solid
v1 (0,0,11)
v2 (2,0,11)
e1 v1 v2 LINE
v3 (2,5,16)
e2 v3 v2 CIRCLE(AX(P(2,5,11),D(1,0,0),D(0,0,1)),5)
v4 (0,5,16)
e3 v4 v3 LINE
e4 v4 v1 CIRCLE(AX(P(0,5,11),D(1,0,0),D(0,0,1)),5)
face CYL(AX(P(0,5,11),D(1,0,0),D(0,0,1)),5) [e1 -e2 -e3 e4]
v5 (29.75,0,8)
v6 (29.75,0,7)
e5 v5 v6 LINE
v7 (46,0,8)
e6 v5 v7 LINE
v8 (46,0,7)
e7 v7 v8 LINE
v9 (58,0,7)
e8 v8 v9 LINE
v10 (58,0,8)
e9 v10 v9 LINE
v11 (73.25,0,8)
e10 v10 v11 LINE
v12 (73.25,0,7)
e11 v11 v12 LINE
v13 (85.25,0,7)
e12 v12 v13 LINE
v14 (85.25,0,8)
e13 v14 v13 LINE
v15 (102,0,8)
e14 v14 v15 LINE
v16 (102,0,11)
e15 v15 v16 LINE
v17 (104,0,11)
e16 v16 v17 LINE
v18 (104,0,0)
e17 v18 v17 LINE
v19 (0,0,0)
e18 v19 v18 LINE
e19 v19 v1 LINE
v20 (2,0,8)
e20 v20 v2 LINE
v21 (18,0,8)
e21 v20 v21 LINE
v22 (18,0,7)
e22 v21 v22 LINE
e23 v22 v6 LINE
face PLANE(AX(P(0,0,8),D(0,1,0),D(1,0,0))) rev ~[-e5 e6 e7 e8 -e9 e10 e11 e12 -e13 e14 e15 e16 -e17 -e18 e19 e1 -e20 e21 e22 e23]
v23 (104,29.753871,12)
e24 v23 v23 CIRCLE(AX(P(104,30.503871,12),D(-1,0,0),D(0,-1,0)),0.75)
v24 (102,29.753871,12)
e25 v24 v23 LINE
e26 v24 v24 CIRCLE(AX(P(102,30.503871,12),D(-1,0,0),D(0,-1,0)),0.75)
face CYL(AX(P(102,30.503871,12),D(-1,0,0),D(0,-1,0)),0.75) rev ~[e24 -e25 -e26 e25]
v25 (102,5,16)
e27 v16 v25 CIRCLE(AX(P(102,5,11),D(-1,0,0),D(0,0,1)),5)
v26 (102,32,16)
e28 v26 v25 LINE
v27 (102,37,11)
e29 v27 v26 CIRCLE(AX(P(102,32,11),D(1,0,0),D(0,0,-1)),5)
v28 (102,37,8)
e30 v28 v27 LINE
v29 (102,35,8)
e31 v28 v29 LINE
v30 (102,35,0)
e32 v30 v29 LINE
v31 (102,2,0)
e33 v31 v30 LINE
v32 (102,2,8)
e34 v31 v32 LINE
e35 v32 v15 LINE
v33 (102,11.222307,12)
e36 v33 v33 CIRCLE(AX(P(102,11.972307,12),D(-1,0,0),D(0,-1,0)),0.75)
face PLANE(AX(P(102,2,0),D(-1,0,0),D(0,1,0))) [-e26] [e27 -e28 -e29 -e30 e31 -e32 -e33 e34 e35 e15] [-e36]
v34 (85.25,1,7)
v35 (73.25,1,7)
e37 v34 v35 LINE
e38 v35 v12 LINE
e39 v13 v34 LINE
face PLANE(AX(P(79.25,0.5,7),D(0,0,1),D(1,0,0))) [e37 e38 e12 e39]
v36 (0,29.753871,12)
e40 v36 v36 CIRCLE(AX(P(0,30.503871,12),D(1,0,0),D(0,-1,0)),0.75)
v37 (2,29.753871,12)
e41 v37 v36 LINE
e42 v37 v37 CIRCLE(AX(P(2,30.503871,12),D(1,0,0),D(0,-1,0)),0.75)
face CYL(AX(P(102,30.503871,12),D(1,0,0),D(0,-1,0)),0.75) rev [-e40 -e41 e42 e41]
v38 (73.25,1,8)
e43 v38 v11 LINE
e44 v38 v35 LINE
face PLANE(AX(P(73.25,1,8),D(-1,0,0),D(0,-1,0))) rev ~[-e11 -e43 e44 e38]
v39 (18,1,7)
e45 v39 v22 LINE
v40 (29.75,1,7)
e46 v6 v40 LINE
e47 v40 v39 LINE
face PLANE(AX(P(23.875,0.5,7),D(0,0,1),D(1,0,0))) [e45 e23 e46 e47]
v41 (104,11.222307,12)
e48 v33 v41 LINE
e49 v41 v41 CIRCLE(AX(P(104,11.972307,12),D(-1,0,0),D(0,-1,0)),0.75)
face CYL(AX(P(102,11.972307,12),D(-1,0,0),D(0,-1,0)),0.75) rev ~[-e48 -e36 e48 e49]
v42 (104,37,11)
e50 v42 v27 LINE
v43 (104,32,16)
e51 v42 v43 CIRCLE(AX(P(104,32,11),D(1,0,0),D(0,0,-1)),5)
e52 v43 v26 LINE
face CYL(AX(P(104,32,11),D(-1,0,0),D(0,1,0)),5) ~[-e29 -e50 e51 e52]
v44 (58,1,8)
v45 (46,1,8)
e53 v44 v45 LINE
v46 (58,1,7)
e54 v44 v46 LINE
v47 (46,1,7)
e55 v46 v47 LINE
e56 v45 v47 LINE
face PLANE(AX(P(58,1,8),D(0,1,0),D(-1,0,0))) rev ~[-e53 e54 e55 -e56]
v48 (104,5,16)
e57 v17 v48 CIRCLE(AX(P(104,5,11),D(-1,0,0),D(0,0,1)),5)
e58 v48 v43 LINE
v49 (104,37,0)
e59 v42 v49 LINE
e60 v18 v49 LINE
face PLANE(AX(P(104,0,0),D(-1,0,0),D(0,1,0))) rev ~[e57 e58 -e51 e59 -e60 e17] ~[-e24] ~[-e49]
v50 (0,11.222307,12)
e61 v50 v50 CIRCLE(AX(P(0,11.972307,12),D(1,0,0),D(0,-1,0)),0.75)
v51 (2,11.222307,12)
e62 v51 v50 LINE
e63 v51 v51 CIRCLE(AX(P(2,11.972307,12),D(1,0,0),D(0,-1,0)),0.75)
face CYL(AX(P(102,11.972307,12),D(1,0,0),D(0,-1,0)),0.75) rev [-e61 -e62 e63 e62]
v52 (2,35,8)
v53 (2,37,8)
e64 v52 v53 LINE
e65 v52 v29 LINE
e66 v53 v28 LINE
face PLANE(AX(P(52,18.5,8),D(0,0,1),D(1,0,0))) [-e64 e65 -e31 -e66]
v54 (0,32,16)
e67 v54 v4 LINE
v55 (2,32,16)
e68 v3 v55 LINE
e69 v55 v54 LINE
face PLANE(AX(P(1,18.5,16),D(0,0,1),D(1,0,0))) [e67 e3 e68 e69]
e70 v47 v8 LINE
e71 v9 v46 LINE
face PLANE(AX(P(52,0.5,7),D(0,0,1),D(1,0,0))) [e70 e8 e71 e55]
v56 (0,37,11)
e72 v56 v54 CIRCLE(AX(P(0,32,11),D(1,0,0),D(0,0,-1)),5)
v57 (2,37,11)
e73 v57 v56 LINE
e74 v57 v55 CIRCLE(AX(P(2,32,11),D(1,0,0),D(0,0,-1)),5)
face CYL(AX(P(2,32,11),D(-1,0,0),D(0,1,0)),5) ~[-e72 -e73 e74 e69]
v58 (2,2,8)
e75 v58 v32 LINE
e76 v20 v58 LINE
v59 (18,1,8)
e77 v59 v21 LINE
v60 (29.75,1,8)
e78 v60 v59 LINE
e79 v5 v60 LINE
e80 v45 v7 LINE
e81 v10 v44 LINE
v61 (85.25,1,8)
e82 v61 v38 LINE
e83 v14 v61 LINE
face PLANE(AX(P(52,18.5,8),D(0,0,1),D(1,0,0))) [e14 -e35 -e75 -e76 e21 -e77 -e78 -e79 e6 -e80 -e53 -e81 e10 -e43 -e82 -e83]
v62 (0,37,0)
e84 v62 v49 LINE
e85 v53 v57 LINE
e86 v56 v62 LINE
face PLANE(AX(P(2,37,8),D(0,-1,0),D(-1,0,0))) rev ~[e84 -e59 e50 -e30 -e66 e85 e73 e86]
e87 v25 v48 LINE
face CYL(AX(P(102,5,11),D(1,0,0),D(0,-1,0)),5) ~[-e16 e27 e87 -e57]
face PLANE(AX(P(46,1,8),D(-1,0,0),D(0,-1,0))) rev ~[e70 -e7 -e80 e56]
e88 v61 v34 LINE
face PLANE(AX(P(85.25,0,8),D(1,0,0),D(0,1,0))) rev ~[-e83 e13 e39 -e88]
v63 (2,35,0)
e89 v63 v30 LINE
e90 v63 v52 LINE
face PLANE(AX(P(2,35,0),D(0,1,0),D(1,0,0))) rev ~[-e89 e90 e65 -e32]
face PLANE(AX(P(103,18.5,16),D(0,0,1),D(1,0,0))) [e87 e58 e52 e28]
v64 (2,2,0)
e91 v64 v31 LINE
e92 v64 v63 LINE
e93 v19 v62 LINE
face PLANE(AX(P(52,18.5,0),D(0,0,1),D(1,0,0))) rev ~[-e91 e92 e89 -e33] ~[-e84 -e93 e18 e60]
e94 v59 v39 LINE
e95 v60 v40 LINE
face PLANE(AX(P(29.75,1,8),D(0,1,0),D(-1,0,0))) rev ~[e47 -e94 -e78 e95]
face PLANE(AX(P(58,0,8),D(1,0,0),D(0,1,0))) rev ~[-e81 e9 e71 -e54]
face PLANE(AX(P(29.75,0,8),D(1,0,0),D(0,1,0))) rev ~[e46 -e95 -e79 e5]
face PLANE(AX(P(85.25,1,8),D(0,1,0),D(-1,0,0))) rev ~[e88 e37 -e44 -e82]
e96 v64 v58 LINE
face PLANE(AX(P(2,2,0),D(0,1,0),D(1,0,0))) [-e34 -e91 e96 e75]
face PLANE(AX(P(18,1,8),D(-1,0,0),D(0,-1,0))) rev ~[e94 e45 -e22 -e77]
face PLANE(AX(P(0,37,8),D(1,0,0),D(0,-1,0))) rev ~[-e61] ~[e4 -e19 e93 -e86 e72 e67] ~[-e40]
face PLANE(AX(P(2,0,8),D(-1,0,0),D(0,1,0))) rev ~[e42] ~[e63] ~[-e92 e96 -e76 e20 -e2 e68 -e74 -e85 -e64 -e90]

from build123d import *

# Parameters (mm, degrees)
F0_W          = 104
F0_H          = 37
F0_W_2        = 100
F0_H_2        = 33
F1_DEPTH      = 8
F3_DEPTH      = 1
F5_DEPTH      = 8
F6_R          = 0.75
F7_DEPTH      = 10.7
F7_DEPTH_BACK = 110.5
F8_R          = 5


with BuildPart() as f1:
    # F0 (on Top) → F1 (new body)
    with BuildSketch(Plane.XY):
        with Locations((52, 18.5)):
            Rectangle(F0_W, F0_H)
        with Locations((52, 18.5)):
            Rectangle(F0_W_2, F0_H_2, mode=Mode.SUBTRACT)
    extrude(amount=F1_DEPTH)

    # F2 (on face) → F3 (cut)
    with BuildSketch(Plane.XY.offset(8)):
        Polygon((46, 0), (52, 0), (58, 0), (58, 1), (52, 1), (46, 1), align=None)
        Polygon((18, 0), (24, 0), (29.75, 0), (29.75, 1), (23.75, 1), (18, 1), align=None)
        Polygon((73.25, 0), (80, 0), (85.25, 0), (85.25, 1), (79.25, 1), (73.25, 1), align=None)
    extrude(amount=-F3_DEPTH, mode=Mode.SUBTRACT)

    # F4 (on face) → F5 (join)
    with BuildSketch(Plane.XY.offset(8)):
        Polygon((0, 37), (0, 0), (2, 0), (2, 2), (2, 35), (2, 37), align=None)
        Polygon((104, 37), (102, 37), (102, 35), (102, 2), (102, 0), (104, 0), align=None)
    extrude(amount=F5_DEPTH)

    # F6 (on face) → F7 (cut, two sides)
    with BuildSketch(Plane(origin=(102, 0, 0), x_dir=(0, -1, 0), z_dir=(-1, 0, 0))) as f7_sk:
        with Locations((-30.5038709193, 12)):
            Circle(F6_R)
        with Locations((-11.9723072276, 12)):
            Circle(F6_R)
    extrude(amount=-F7_DEPTH, mode=Mode.SUBTRACT)
    extrude(f7_sk.sketch, amount=F7_DEPTH_BACK, mode=Mode.SUBTRACT)

    # F8
    f8_edges = [f1.edges().sort_by_distance(p)[0] for p in [
        (1, 0, 16),
        (103, 0, 16),
        (103, 37, 16),
        (1, 37, 16),
    ]]
    fillet(f8_edges, radius=F8_R)


solid = f1.part
